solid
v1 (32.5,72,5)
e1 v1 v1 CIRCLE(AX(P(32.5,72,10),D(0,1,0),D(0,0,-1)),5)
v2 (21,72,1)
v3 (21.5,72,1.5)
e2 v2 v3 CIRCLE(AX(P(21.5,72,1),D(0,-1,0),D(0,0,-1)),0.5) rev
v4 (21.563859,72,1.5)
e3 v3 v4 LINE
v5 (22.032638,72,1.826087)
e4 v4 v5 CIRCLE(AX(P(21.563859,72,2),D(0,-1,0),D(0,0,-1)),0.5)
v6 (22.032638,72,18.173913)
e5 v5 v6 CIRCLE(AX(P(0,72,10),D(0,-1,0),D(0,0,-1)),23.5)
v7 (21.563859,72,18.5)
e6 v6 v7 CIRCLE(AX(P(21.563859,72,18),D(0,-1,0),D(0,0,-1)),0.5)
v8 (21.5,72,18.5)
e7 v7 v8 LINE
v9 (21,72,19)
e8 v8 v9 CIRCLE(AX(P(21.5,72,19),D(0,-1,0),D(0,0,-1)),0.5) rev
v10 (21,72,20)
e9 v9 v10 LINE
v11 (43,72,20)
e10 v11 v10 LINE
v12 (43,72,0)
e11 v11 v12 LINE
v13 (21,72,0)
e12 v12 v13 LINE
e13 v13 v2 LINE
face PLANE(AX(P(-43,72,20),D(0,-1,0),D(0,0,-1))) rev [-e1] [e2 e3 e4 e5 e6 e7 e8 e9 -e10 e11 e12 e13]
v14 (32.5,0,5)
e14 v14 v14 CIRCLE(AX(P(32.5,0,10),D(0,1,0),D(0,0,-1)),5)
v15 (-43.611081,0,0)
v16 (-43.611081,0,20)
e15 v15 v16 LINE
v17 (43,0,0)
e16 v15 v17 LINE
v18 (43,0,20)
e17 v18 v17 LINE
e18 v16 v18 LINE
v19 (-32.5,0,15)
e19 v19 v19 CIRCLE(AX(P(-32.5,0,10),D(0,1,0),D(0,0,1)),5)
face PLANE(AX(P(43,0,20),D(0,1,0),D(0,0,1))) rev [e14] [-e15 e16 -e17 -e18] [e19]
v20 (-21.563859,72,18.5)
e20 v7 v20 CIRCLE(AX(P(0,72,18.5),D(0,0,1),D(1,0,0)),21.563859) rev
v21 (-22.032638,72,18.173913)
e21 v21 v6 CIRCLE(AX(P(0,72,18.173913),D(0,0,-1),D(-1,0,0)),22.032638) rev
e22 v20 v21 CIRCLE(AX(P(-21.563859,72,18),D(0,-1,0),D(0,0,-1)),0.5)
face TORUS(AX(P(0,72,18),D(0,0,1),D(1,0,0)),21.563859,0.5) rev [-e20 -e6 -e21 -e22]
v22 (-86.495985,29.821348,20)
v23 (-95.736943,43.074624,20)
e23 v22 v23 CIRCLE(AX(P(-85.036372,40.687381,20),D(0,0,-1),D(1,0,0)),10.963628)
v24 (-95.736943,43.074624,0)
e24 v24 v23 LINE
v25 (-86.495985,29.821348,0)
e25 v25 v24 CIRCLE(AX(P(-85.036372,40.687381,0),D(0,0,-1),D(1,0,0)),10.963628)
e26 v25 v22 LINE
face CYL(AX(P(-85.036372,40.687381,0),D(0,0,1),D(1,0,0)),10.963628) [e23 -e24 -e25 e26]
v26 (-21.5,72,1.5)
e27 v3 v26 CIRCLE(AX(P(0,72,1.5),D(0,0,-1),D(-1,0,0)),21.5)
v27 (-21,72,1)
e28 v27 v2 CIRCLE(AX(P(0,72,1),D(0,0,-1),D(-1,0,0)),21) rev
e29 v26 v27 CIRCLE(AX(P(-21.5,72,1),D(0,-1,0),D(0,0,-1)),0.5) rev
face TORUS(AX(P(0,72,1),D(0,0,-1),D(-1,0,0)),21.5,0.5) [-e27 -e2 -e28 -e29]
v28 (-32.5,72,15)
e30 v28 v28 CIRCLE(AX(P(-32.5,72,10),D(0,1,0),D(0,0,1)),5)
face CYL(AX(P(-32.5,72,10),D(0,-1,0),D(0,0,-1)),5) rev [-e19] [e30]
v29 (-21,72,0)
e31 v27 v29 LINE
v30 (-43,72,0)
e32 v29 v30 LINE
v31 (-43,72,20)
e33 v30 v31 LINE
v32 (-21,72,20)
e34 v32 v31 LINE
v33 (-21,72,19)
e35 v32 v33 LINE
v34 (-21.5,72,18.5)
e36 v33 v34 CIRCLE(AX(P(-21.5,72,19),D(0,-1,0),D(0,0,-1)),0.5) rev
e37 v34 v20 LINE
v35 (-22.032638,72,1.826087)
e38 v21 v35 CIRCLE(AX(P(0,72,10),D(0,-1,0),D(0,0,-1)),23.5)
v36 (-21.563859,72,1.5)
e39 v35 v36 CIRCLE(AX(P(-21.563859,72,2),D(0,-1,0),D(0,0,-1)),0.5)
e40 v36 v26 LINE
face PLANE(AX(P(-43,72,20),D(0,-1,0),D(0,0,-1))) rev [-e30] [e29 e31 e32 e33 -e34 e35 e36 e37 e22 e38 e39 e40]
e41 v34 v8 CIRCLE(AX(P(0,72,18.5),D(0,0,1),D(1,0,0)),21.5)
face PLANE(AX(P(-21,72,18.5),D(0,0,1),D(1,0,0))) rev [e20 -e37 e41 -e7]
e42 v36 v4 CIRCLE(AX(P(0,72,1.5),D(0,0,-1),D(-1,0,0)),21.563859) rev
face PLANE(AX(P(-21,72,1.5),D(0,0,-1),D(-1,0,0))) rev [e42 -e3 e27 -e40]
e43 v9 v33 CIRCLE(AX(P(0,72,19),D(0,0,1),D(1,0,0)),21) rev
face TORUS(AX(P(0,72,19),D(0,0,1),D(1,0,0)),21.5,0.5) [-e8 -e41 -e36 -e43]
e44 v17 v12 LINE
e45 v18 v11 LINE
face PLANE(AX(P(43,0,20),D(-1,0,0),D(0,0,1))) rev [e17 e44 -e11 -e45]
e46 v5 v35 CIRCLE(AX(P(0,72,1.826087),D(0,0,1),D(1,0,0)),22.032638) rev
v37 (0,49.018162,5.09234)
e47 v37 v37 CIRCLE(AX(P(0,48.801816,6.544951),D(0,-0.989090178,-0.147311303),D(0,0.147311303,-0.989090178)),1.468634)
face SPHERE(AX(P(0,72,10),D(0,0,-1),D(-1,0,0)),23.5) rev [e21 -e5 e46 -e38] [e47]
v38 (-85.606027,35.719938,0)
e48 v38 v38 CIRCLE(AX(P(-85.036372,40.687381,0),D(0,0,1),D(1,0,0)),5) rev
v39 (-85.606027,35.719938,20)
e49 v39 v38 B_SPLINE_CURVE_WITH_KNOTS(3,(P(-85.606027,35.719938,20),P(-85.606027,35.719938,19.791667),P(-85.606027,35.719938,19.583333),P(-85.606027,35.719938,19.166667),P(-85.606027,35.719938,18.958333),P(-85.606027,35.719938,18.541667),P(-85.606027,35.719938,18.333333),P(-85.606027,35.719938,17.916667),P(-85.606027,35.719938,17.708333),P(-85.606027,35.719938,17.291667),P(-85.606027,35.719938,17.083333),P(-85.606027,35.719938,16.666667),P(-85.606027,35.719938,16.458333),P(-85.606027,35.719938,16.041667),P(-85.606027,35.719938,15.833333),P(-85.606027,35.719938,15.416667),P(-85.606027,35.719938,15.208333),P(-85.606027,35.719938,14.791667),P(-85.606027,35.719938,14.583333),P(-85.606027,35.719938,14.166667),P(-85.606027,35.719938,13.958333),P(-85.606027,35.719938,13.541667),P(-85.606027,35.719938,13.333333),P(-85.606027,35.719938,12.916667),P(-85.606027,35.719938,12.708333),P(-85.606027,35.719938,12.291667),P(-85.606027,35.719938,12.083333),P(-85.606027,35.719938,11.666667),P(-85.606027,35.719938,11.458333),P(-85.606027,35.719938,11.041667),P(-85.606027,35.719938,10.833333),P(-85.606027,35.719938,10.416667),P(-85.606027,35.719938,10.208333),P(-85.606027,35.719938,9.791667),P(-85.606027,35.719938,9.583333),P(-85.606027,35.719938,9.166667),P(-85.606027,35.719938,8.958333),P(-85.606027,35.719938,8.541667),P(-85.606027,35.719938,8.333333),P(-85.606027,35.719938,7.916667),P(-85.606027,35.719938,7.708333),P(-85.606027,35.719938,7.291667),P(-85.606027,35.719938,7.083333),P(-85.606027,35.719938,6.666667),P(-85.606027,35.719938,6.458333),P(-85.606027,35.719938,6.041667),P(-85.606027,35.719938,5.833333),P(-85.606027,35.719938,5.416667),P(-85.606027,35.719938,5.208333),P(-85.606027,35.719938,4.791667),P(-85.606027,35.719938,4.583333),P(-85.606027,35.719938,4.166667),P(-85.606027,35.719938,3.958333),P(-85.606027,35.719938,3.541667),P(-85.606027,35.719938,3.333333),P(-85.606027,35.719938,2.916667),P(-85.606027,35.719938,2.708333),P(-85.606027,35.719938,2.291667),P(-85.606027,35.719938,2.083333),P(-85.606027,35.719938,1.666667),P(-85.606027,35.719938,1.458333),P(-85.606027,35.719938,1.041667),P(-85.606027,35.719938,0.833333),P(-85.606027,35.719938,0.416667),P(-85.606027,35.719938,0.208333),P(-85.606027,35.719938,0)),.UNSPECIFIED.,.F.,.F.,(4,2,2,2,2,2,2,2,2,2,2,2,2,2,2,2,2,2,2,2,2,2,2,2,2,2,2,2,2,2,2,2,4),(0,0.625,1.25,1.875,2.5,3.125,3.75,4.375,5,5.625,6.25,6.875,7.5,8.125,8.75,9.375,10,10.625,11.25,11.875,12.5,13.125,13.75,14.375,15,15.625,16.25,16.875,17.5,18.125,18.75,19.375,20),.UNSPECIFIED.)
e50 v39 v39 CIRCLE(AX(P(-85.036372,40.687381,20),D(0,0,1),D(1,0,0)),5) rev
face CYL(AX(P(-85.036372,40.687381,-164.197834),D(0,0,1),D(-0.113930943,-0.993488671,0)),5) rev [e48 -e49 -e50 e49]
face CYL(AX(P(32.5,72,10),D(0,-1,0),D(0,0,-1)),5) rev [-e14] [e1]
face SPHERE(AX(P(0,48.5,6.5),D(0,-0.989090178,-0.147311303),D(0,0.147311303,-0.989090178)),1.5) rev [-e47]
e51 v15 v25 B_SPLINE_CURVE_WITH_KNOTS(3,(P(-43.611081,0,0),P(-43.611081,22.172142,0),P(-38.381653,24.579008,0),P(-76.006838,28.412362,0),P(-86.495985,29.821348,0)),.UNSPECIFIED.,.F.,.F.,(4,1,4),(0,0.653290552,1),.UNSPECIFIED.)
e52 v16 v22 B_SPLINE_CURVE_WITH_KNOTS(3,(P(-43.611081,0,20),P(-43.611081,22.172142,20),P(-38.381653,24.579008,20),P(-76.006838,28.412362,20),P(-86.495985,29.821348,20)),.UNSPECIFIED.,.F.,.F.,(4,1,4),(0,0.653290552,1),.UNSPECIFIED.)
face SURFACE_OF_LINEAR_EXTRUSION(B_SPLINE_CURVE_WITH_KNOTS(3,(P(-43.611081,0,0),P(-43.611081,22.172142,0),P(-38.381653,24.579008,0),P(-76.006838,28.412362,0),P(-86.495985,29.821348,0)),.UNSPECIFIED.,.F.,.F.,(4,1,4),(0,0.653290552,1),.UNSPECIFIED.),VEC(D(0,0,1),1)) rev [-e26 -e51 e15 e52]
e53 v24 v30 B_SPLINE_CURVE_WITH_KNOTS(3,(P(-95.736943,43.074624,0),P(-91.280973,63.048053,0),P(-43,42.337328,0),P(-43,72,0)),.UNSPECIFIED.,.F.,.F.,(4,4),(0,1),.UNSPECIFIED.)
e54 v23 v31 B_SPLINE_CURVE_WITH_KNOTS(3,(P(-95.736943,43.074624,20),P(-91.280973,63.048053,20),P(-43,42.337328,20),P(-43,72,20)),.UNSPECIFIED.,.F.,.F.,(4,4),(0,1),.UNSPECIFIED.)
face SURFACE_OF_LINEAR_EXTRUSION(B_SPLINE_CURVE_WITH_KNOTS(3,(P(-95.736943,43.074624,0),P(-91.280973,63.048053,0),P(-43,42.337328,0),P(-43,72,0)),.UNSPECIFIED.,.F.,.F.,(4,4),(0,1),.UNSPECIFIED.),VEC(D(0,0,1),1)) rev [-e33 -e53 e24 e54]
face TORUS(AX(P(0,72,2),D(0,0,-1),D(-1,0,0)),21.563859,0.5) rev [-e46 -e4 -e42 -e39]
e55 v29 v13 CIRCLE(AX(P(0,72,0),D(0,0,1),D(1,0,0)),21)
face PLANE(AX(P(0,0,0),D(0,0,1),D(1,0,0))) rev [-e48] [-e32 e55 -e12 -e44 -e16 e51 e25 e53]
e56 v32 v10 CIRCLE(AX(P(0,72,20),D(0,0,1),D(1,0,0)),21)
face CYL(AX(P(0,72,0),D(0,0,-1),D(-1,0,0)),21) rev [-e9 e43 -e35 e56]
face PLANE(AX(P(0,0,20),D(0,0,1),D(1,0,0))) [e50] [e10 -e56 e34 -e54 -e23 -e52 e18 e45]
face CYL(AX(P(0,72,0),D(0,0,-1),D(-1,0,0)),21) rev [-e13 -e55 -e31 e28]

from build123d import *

# Parameters (mm, degrees)
SKETCH1_W           = 86
SKETCH1_H           = 72
BOSS_EXTRUDE1_DEPTH = 20
SKETCH2_R           = 5
CUT_EXTRUDE1_DEPTH  = 87.214847909
FILLET1_R           = 0.5
FILLET2_R           = 0.5
SKETCH6_W           = 20
SKETCH6_H           = 72
BOSS_EXTRUDE2_DEPTH = 53
CAVITY1_OUTLINE_R   = 5
CAVITY1_DEPTH       = 20
CUT_EXTRUDE2_DEPTH  = 122.65525076


# Read off the part's stored shape, not the designer's step: Cavity1
with BuildPart() as part:
    # Sketch1 → Boss-Extrude1 (new body)
    with BuildSketch(Plane.XY):
        with Locations((0, 36)):
            Rectangle(SKETCH1_W, SKETCH1_H)
    extrude(amount=BOSS_EXTRUDE1_DEPTH)

    # Sketch2 → Cut-Extrude1 (cut, through all)
    with BuildSketch(Plane(origin=(0, 0, 0), x_dir=(1, 0, 0), z_dir=(0, 1, 0))):
        with Locations(Location((-32.5, -10, 0), (0, 0, 270))):
            Circle(SKETCH2_R)
        with Locations(Location((32.5, -10, 0), (0, 0, 90))):
            Circle(SKETCH2_R)
    extrude(amount=CUT_EXTRUDE1_DEPTH, mode=Mode.SUBTRACT)

    # Sketch4 → Cut-Revolve1 (revolve, cut)
    with BuildSketch(Plane(origin=(0, 72, 0), x_dir=(-1, 0, 0), z_dir=(0, 1, 0))):
        with BuildLine():
            Line((0, 0), (0, 20))
            Line((0, 20), (21, 20))
            Line((21, 20), (21, 18.5))
            Line((21, 18.5), (21.9089023, 18.5))
            ThreePointArc((21.9089023, 18.5), (23.5, 10), (21.9089023, 1.5))
            Line((21.9089023, 1.5), (21, 1.5))
            Line((21, 1.5), (21, 0))
            Line((21, 0), (0, 0))
        make_face()
    revolve(axis=Axis((0, 72, 0), (0, 0, 1)), mode=Mode.SUBTRACT)

    # Sketch5 → Cut-Revolve2 (revolve, cut)
    with BuildSketch(Plane(origin=(0, 48.5, 0), x_dir=(1, 0, 0), z_dir=(0, 1, 0))):
        with BuildLine():
            Line((0, -5), (0, -8))
            ThreePointArc((0, -8), (-1.5, -6.5), (0, -5))
        make_face()
    revolve(axis=Axis((0, 48.5, 0), (0, 0, 1)), mode=Mode.SUBTRACT)

    # Fillet1
    fillet1_edges = [part.edges().sort_by_distance(p)[0] for p in [
        (0, 50.0910977, 18.5),
        (0, 50.0910977, 1.5),
    ]]
    fillet(fillet1_edges, radius=FILLET1_R)

    # Fillet2
    fillet2_edges = [part.edges().sort_by_distance(p)[0] for p in [
        (0, 51, 18.5),
        (0, 51, 1.5),
    ]]
    fillet(fillet2_edges, radius=FILLET2_R)

    # Sketch6 → Boss-Extrude2 (add)
    with BuildSketch(Plane(origin=(-43, 0, 0), x_dir=(0, 0, -1), z_dir=(1, 0, 0))):
        with Locations((-10, 36)):
            Rectangle(SKETCH6_W, SKETCH6_H)
    extrude(amount=-BOSS_EXTRUDE2_DEPTH)

    # Cavity1 outline → Cavity1 (cut)
    with BuildSketch(Plane.XY):
        with Locations((-85.036371952, 40.687381171)):
            Circle(CAVITY1_OUTLINE_R)
    extrude(amount=CAVITY1_DEPTH, mode=Mode.SUBTRACT)

    # Sketch8 → Cut-Extrude2 (cut, through all)
    with BuildSketch(Plane.XY.offset(20)):
        with BuildLine():
            Line((-43.611081488, 0), (-43.611081488, -5.76813428))
            Line((-43.611081488, -5.76813428), (-107.878292828, -5.76813428))
            Line((-107.878292828, -5.76813428), (-107.878292828, 57.33150687))
            Line((-107.878292828, 57.33150687), (-107.878292828, 72))
            Line((-107.878292828, 72), (-43, 72))
            add(Edge.make_bspline(
                [(-95.73694265, 43.074623662), (-91.28097288, 63.04805315), (-43, 42.337327556), (-43, 72)],
                knots=[0, 0, 0, 0, 1, 1, 1, 1], degree=3))
            ThreePointArc((-95.73694265, 43.074623662), (-95.93403723, 41.888227318), (-96, 40.687381171))
            ThreePointArc((-96, 40.687381171), (-93.288759206, 33.469400526), (-86.495984658, 29.821348283))
            add(Edge.make_bspline(
                [(-86.495984658, 29.821348283), (-76.006838116, 28.412361974), (-38.381653368, 24.579008499), (-43.611081488, 22.17214242), (-43.611081488, 0)],
                knots=[0, 0, 0, 0, 0.346709448, 1, 1, 1, 1], degree=3))
        make_face()
    extrude(amount=-CUT_EXTRUDE2_DEPTH, mode=Mode.SUBTRACT)


solid = part.part
